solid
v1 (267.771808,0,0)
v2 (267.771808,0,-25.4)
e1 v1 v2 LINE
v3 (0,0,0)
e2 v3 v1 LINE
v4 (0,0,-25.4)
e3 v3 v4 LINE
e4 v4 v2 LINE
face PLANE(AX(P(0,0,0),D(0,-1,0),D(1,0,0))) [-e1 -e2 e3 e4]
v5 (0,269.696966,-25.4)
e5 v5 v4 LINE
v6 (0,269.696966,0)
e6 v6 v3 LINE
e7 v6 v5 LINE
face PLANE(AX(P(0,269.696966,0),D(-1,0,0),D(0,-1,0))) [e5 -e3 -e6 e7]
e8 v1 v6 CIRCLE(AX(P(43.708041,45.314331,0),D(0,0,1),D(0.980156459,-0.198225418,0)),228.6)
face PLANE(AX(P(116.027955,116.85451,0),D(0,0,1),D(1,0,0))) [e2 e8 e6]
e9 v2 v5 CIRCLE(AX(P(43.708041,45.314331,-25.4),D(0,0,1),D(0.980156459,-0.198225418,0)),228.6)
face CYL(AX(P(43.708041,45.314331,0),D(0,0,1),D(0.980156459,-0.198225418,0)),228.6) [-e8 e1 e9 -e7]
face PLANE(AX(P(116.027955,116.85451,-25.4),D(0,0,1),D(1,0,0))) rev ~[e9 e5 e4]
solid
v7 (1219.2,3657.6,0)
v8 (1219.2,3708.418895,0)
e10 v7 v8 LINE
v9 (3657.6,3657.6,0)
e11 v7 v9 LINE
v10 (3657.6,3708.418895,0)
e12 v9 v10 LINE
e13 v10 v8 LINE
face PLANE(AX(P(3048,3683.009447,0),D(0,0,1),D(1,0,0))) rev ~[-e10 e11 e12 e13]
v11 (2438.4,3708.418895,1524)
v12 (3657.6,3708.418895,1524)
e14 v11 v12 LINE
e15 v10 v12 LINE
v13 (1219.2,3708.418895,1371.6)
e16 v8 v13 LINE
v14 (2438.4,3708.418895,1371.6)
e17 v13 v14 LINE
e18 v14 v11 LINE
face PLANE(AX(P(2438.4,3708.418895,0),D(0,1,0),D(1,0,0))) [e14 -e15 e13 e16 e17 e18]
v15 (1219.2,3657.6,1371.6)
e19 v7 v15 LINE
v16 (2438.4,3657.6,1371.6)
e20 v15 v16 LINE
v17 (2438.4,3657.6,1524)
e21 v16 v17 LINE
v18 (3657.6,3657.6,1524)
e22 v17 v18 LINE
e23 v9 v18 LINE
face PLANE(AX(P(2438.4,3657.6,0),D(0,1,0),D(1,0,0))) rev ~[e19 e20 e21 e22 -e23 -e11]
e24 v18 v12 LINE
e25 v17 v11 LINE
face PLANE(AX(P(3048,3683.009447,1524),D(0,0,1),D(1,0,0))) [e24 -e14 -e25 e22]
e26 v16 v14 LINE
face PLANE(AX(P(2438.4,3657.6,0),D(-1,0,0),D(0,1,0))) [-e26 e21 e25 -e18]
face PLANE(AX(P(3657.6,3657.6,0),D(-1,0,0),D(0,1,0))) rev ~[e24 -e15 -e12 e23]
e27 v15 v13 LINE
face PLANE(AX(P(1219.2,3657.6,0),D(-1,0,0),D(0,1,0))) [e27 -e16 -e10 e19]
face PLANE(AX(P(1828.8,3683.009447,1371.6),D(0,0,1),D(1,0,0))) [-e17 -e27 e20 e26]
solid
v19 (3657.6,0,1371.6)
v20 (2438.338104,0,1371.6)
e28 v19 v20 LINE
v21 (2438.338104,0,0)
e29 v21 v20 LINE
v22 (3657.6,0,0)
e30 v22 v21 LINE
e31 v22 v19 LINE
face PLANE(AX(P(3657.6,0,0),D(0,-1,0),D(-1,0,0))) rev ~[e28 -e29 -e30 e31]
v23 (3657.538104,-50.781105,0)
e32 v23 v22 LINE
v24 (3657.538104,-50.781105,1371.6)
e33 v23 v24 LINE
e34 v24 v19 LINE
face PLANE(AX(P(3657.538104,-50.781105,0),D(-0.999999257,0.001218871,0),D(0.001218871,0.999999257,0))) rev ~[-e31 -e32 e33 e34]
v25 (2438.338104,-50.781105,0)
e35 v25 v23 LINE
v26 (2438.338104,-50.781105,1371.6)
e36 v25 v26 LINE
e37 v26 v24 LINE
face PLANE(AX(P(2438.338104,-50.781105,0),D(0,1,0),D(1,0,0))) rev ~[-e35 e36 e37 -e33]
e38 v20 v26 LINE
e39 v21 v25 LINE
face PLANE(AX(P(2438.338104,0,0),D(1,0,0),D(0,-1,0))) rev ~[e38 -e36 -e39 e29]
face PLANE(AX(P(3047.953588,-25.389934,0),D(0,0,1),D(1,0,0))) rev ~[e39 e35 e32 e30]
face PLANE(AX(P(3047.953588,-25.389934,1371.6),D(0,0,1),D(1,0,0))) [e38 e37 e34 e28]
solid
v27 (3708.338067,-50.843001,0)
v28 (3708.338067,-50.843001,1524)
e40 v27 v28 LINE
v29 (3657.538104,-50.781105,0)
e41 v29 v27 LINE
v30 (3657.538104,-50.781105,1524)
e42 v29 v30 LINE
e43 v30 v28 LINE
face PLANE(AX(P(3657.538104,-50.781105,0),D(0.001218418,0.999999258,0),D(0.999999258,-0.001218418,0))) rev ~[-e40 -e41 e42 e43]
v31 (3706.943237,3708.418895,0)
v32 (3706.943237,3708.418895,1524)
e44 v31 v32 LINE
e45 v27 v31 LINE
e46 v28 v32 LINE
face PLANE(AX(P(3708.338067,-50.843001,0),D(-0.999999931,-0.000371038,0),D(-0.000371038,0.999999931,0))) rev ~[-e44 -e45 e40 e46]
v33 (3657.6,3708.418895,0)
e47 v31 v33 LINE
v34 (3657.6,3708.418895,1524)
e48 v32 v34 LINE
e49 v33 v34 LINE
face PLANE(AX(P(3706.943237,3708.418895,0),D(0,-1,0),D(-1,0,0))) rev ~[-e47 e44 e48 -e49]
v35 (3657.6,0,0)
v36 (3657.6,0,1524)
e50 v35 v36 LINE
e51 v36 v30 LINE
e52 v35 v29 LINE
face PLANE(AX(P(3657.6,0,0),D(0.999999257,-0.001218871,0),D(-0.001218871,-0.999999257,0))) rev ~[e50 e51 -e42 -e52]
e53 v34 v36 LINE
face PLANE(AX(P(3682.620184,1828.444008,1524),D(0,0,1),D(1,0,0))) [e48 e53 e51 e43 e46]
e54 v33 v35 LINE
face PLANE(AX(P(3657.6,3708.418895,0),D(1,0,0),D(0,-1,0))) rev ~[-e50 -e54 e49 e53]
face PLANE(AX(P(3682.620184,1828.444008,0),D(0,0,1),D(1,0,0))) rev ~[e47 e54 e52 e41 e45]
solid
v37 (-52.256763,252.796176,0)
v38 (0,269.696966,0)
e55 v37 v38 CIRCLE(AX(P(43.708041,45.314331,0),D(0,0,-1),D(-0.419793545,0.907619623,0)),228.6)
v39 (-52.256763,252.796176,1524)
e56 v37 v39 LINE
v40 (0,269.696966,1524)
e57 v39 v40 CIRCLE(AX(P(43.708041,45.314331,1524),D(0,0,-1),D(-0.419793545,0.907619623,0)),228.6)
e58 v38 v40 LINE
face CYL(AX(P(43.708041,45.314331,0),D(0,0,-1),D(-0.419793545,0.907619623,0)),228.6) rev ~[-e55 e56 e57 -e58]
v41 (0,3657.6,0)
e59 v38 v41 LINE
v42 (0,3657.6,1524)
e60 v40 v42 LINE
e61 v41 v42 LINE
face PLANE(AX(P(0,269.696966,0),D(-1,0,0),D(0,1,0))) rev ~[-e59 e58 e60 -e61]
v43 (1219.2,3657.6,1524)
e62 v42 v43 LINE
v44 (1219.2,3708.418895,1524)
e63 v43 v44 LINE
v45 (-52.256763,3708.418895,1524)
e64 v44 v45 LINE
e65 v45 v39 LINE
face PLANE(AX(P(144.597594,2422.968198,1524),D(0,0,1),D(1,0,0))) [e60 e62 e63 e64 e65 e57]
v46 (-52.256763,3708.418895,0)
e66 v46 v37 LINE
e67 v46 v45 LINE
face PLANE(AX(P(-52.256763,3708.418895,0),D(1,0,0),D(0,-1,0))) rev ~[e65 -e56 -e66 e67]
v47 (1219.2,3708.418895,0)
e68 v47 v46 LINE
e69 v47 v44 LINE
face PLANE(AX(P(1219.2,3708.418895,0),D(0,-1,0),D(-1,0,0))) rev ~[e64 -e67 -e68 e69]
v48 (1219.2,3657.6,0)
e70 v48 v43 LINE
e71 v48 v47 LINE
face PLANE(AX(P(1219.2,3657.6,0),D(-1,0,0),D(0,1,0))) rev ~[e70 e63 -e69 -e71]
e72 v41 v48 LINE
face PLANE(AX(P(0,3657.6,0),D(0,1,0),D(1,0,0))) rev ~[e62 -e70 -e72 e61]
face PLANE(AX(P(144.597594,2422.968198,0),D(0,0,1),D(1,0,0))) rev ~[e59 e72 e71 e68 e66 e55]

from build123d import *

# Parameters (mm, degrees)
F1_DEPTH = 1371.6
F0_W     = 1219.2
F0_H     = 50.8188946724
F2_DEPTH = 1371.6
F3_DEPTH = 1524
F4_DEPTH = 1524
F5_DEPTH = 1524
F6_DEPTH = 25.4


# Not quite as in the source:
# - ends of sketch curves that miss each other by under 0.0002 mm in the source are joined


with BuildPart() as f1:
    # F0 (on Top) → F1 (new body)
    with BuildSketch(Plane.XY):
        Polygon((3657.6, 0), (2438.3381043434, 0), (2438.3381043434, -50.7811053276), (3657.5381043434, -50.7811053276), align=None)
    extrude(amount=F1_DEPTH)


with BuildPart() as f2:
    # F0 (on Top) → F2 (new body)
    with BuildSketch(Plane.XY):
        with Locations((1828.8, 3683.0094473362)):
            Rectangle(F0_W, F0_H)
    extrude(amount=F2_DEPTH)

    # F0 (on Top) → F3 (join)
    with BuildSketch(Plane.XY):
        with Locations((3048, 3683.0094473362)):
            Rectangle(F0_W, F0_H)
    extrude(amount=F3_DEPTH)


with BuildPart() as f4:
    # F0 (on Top) → F4 (new body)
    with BuildSketch(Plane.XY):
        with BuildLine():
            ThreePointArc((-52.2567629814, 252.7961764093), (-26.6377838889, 262.8216290531), (0, 269.6969661319))
            Line((0, 269.6969661319), (0, 3657.6))
            Line((0, 3657.6), (1219.2, 3657.6))
            Line((1219.2, 3657.6), (1219.2, 3708.4188946724))
            Line((1219.2, 3708.4188946724), (-52.2567629814, 3708.4188946724))
            Line((-52.2567629814, 3708.4188946724), (-52.2567629814, 252.7961764093))
        make_face()
    extrude(amount=F4_DEPTH)


with BuildPart() as f5:
    # F0 (on Top) → F5 (new body)
    with BuildSketch(Plane.XY):
        Polygon((3657.6, 0.0188946724), (3657.6, 0), (3657.5381043434, -50.7811053276), (3708.3380666361, -50.8430009382), (3706.9432370186, 3708.4188946724), (3657.6, 3708.4188946724), (3657.6, 3657.6), align=None)
    extrude(amount=F5_DEPTH)


with BuildPart() as f6:
    # F0 (on Top) → F6 (new body)
    with BuildSketch(Plane.XY):
        with BuildLine():
            Line((0, 269.6969661319), (0, 0))
            Line((0, 0), (267.7718077733, 0))
            ThreePointArc((267.7718077733, 0), (271.1711559173, 22.5439223267), (272.3080413103, 45.3143306077))
            ThreePointArc((272.3080413103, 45.3143306077), (189.0804970171, 221.7365772824), (0, 269.6969661319))
        make_face()
    extrude(amount=-F6_DEPTH)


solid = Compound([f1.part, f2.part, f4.part, f5.part, f6.part])
